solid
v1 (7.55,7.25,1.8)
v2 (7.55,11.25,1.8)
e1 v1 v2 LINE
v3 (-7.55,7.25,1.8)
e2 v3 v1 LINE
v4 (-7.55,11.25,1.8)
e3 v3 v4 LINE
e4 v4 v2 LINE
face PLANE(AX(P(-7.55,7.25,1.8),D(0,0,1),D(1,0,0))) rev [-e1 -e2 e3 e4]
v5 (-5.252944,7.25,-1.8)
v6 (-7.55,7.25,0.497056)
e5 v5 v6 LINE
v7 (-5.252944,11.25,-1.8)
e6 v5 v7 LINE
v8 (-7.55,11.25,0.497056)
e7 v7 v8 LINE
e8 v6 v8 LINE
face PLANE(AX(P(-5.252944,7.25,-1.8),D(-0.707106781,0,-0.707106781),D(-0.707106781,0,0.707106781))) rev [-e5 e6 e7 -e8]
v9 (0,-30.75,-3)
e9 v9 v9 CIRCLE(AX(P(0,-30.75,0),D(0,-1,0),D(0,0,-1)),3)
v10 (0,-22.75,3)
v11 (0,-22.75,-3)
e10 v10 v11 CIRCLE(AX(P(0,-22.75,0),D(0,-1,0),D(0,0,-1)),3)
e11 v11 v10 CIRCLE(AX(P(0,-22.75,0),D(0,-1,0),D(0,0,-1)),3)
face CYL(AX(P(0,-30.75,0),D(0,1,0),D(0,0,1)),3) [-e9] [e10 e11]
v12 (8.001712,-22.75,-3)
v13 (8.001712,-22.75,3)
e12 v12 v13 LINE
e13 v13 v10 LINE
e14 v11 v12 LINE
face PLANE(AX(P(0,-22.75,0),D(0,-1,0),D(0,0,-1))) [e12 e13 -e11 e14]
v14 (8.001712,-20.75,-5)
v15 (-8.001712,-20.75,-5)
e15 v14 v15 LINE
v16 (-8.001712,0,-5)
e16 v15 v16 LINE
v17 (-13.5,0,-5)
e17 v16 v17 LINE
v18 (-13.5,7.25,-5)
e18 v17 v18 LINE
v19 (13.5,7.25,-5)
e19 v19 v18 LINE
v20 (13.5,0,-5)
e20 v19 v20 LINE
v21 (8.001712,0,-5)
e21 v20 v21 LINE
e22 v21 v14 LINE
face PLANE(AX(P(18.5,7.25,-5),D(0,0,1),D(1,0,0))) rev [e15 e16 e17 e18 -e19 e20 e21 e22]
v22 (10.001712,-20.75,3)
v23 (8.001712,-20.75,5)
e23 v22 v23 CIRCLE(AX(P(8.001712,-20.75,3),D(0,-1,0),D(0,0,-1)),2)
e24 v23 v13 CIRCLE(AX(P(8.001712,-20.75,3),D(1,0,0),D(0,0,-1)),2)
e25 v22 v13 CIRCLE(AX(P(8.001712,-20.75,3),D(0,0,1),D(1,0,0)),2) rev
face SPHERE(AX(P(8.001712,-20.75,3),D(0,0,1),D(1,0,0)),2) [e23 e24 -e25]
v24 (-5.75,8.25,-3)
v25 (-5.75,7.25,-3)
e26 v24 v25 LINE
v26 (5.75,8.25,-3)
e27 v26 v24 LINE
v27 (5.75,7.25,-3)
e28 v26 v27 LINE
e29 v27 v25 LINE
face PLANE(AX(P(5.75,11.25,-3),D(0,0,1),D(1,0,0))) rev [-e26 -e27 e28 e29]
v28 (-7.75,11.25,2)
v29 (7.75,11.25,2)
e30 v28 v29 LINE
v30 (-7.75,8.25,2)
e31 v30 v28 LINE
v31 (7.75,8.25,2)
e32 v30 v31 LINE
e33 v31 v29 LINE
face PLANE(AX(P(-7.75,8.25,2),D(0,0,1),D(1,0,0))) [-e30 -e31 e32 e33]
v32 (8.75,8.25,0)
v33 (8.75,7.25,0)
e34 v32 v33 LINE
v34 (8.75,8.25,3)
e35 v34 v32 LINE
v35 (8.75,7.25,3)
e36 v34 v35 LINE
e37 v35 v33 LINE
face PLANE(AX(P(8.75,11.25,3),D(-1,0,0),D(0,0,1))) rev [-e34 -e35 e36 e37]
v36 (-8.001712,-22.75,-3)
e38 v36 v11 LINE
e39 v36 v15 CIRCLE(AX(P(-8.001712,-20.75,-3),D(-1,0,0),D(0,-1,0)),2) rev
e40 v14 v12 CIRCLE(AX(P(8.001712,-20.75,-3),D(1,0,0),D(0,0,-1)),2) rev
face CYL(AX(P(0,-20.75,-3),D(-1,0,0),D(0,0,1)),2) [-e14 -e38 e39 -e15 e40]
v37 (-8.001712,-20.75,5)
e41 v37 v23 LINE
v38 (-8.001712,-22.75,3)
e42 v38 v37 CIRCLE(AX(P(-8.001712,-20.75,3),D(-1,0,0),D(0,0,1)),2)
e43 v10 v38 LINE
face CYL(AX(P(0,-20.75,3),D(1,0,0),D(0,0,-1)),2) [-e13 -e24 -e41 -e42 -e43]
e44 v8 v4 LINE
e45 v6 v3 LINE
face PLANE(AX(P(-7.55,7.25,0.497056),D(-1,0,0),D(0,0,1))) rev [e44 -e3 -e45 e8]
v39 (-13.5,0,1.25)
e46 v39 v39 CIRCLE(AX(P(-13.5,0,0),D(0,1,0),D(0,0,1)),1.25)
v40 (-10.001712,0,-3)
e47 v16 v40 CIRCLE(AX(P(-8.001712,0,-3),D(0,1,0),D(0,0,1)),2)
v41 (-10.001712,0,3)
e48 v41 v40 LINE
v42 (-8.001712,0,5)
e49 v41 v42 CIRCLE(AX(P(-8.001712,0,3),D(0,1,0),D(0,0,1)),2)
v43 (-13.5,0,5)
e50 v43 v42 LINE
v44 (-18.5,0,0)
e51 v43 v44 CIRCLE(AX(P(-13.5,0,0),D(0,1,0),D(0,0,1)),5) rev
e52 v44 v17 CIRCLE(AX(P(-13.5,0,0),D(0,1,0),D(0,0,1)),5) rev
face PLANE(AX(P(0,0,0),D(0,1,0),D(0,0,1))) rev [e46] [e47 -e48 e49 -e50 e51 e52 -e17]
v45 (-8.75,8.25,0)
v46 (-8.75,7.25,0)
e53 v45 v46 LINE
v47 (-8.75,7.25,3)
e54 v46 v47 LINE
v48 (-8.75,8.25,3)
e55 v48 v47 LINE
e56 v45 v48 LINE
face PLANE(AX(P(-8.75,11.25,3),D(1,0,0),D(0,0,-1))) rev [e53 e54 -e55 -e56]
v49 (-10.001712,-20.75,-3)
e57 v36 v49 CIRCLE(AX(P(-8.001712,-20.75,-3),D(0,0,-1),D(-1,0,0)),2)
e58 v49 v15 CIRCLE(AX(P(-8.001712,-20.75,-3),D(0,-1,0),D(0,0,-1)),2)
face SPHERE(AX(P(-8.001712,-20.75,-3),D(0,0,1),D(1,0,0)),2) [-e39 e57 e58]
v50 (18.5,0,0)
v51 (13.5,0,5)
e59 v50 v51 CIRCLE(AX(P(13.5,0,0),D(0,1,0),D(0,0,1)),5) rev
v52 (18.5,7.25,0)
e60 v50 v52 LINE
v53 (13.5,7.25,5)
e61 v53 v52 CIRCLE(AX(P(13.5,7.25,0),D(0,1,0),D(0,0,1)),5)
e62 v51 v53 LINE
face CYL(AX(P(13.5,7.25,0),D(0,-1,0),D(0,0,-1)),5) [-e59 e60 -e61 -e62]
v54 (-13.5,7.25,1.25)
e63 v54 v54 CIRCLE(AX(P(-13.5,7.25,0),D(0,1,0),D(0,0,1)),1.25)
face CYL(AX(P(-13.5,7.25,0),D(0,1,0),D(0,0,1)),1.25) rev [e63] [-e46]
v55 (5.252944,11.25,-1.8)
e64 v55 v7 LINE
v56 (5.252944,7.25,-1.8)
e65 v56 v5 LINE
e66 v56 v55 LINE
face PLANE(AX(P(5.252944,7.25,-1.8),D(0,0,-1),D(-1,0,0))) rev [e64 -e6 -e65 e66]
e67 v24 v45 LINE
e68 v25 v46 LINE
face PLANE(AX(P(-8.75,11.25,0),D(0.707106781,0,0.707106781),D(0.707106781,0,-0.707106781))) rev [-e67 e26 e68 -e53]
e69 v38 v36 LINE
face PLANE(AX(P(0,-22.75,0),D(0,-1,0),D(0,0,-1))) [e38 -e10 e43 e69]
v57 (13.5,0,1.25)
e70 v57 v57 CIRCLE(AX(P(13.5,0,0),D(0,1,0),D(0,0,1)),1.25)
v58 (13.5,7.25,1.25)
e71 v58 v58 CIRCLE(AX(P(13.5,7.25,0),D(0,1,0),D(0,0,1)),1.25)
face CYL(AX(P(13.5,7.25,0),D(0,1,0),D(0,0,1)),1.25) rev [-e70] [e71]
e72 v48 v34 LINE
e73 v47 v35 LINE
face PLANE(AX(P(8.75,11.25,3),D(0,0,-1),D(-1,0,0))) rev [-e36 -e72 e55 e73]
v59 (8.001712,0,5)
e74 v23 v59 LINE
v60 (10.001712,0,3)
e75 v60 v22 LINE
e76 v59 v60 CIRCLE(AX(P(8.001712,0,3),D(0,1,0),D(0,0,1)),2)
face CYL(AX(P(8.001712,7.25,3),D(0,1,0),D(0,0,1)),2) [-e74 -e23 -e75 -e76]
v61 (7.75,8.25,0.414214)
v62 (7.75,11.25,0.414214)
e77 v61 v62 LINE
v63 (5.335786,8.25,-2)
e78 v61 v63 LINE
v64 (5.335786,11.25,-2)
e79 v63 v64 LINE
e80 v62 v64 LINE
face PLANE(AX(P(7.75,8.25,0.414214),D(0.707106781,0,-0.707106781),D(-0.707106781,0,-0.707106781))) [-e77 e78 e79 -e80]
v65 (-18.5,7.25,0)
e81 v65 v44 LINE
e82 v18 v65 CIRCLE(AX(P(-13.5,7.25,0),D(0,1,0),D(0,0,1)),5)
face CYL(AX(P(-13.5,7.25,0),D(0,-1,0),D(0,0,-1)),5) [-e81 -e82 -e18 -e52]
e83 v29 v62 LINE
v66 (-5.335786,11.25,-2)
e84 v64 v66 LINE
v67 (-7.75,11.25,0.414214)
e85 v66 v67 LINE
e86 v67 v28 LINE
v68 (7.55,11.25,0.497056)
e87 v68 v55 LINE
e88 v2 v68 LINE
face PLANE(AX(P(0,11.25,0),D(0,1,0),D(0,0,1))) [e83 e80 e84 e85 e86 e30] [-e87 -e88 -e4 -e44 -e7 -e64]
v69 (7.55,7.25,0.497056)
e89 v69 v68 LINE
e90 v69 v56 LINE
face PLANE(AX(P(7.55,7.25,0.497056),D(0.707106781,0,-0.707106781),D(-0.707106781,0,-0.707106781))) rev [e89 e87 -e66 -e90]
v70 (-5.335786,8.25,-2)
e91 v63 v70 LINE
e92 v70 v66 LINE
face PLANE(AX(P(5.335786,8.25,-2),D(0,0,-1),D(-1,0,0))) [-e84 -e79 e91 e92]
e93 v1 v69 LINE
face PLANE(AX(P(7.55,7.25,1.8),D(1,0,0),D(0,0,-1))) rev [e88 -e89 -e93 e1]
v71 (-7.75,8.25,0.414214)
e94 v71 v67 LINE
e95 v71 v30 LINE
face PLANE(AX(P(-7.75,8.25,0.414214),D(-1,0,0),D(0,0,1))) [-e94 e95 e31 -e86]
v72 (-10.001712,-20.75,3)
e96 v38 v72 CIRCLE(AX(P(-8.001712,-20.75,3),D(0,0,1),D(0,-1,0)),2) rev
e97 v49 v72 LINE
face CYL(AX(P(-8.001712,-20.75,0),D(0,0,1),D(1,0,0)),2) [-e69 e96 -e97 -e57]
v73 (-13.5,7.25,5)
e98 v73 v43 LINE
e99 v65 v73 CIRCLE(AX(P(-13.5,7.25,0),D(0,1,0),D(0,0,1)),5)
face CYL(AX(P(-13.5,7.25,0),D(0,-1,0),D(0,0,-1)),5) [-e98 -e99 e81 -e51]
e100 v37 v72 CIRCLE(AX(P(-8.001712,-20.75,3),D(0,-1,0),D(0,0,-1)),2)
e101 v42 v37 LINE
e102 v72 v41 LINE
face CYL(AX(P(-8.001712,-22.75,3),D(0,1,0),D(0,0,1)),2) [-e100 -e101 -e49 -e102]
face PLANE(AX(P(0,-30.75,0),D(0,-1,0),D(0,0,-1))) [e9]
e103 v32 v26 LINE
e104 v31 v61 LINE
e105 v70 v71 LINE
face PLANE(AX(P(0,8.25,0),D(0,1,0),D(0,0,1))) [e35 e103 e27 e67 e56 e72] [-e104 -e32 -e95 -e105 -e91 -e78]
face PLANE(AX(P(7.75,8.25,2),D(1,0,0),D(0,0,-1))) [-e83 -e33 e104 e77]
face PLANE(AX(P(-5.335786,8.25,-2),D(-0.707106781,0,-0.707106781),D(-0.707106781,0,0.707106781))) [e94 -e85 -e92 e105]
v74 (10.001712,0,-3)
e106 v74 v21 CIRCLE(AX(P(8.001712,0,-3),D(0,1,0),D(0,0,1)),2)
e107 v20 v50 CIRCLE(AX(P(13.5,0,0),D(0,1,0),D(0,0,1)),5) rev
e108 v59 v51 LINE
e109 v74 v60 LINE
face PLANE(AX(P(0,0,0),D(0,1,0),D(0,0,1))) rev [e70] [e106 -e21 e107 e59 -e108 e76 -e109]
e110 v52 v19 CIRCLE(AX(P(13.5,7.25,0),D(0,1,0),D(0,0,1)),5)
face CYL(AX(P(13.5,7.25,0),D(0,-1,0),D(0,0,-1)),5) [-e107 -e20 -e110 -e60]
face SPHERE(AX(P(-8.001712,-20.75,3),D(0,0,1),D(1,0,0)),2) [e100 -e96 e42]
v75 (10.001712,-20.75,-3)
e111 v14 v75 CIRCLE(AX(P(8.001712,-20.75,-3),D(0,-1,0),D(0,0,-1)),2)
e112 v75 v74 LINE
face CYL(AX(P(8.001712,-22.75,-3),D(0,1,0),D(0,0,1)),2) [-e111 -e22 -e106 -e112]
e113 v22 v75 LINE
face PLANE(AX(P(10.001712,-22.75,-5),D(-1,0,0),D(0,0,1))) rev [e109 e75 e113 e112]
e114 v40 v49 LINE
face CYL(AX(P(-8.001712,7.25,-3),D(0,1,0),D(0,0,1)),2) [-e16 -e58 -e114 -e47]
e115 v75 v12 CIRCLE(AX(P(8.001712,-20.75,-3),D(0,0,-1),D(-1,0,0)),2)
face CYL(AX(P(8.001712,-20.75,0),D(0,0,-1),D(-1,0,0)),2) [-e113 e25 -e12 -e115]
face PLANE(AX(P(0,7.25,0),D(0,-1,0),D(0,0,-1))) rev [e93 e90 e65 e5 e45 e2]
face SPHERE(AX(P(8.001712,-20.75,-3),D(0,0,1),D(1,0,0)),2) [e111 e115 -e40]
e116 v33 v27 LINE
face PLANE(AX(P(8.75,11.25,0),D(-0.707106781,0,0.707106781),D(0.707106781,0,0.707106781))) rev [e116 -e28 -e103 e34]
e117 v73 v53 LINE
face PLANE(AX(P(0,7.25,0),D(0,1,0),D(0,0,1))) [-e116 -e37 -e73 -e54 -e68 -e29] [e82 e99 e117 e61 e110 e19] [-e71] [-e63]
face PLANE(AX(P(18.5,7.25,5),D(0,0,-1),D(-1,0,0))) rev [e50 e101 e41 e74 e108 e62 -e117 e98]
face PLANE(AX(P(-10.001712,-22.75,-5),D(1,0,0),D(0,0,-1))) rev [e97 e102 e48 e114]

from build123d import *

# Parameters (mm, degrees)
SKETCH_1_W          = 37
SKETCH_1_H          = 10
EXTRUDE_1_DEPTH     = 7.25
EXTRUDE_2_DEPTH     = 4
FILLET_1_R          = 5
CUT_EXTRUDE_1_DEPTH = 3
CUT_EXTRUDE_3_DEPTH = 4
HOLE_WIZARD_M3_1_D  = 2.5
SKETCH_7_W          = 20.003423604
SKETCH_7_H          = 10
EXTRUDE_3_DEPTH     = 22.75
SKETCH_8_R          = 3
EXTRUDE_4_DEPTH     = 8
FILLET_2_R          = 2


with BuildPart() as part:
    # 草图1 → 凸台-拉伸1 (new body)
    with BuildSketch(Plane(origin=(0, 0, 0), x_dir=(1, 0, 0), z_dir=(0, 1, 0))):
        Rectangle(SKETCH_1_W, SKETCH_1_H)
    extrude(amount=EXTRUDE_1_DEPTH)

    # 草图2 → 凸台-拉伸2 (add)
    with BuildSketch(Plane(origin=(0, 7.25, 0), x_dir=(1, 0, 0), z_dir=(0, 1, 0))):
        Polygon((-8.75, 0), (-5.75, 3), (5.75, 3), (8.75, 0), (8.75, -3), (-8.75, -3), align=None)
    extrude(amount=EXTRUDE_2_DEPTH)

    # 圆角1
    fillet_1_edges = [part.edges().sort_by_distance(p)[0] for p in [
        (18.5, 3.625, 5),
        (18.5, 3.625, -5),
        (-18.5, 3.625, 5),
        (-18.5, 3.625, -5),
    ]]
    fillet(fillet_1_edges, radius=FILLET_1_R - 0.0001)  # a hair under: the kernel refuses the full size

    # 草图3 → 切除-拉伸1 (cut)
    with BuildSketch(Plane(origin=(0, 11.25, 0), x_dir=(1, 0, 0), z_dir=(0, 1, 0))):
        Polygon((8.75, -3), (8.75, 0), (5.75, 3), (-5.75, 3), (-8.75, 0), (-8.75, -3), align=None)
        Polygon((7.75, -2), (7.75, -0.414213562), (5.335786438, 2), (-5.335786438, 2), (-7.75, -0.414213562), (-7.75, -2), align=None, mode=Mode.SUBTRACT)
    extrude(amount=-CUT_EXTRUDE_1_DEPTH, mode=Mode.SUBTRACT)

    # 草图4 → 切除-拉伸3 (cut)
    with BuildSketch(Plane(origin=(0, 11.25, 0), x_dir=(1, 0, 0), z_dir=(0, 1, 0))):
        Polygon((-7.55, -0.497056275), (-7.55, -1.8), (7.55, -1.8), (7.55, -0.497056275), (5.252943725, 1.8), (-5.252943725, 1.8), align=None)
    extrude(amount=-CUT_EXTRUDE_3_DEPTH, mode=Mode.SUBTRACT)

    # M3 螺纹孔1 (through all)
    with Locations(Plane(origin=(0, 7.25, 0), x_dir=(1, 0, 0), z_dir=(0, 1, 0))):
        with Locations((-13.5, 0), (13.5, 0)):
            Hole(HOLE_WIZARD_M3_1_D / 2)

    # 草图7 → 凸台-拉伸3 (add)
    with BuildSketch(Plane.XZ):
        Rectangle(SKETCH_7_W, SKETCH_7_H)
    extrude(amount=EXTRUDE_3_DEPTH)

    # 草图8 → 凸台-拉伸4 (add)
    with BuildSketch(Plane.XZ.offset(22.75)):
        with Locations(Location((0, 0, 0), (0, 0, 270))):
            Circle(SKETCH_8_R)
    extrude(amount=EXTRUDE_4_DEPTH)

    # 圆角2
    fillet_2_edges = [part.edges().sort_by_distance(p)[0] for p in [
        (-10.001711802, -11.375, 5),
        (-10.001711802, -11.375, -5),
        (10.001711802, -11.375, -5),
        (10.001711802, -11.375, 5),
        (-10.001711802, -22.75, 0),
        (0, -22.75, -5),
        (10.001711802, -22.75, 0),
        (0, -22.75, 5),
    ]]
    fillet(fillet_2_edges, radius=FILLET_2_R - 0.0001)  # a hair under: the kernel refuses the full size


solid = part.part
